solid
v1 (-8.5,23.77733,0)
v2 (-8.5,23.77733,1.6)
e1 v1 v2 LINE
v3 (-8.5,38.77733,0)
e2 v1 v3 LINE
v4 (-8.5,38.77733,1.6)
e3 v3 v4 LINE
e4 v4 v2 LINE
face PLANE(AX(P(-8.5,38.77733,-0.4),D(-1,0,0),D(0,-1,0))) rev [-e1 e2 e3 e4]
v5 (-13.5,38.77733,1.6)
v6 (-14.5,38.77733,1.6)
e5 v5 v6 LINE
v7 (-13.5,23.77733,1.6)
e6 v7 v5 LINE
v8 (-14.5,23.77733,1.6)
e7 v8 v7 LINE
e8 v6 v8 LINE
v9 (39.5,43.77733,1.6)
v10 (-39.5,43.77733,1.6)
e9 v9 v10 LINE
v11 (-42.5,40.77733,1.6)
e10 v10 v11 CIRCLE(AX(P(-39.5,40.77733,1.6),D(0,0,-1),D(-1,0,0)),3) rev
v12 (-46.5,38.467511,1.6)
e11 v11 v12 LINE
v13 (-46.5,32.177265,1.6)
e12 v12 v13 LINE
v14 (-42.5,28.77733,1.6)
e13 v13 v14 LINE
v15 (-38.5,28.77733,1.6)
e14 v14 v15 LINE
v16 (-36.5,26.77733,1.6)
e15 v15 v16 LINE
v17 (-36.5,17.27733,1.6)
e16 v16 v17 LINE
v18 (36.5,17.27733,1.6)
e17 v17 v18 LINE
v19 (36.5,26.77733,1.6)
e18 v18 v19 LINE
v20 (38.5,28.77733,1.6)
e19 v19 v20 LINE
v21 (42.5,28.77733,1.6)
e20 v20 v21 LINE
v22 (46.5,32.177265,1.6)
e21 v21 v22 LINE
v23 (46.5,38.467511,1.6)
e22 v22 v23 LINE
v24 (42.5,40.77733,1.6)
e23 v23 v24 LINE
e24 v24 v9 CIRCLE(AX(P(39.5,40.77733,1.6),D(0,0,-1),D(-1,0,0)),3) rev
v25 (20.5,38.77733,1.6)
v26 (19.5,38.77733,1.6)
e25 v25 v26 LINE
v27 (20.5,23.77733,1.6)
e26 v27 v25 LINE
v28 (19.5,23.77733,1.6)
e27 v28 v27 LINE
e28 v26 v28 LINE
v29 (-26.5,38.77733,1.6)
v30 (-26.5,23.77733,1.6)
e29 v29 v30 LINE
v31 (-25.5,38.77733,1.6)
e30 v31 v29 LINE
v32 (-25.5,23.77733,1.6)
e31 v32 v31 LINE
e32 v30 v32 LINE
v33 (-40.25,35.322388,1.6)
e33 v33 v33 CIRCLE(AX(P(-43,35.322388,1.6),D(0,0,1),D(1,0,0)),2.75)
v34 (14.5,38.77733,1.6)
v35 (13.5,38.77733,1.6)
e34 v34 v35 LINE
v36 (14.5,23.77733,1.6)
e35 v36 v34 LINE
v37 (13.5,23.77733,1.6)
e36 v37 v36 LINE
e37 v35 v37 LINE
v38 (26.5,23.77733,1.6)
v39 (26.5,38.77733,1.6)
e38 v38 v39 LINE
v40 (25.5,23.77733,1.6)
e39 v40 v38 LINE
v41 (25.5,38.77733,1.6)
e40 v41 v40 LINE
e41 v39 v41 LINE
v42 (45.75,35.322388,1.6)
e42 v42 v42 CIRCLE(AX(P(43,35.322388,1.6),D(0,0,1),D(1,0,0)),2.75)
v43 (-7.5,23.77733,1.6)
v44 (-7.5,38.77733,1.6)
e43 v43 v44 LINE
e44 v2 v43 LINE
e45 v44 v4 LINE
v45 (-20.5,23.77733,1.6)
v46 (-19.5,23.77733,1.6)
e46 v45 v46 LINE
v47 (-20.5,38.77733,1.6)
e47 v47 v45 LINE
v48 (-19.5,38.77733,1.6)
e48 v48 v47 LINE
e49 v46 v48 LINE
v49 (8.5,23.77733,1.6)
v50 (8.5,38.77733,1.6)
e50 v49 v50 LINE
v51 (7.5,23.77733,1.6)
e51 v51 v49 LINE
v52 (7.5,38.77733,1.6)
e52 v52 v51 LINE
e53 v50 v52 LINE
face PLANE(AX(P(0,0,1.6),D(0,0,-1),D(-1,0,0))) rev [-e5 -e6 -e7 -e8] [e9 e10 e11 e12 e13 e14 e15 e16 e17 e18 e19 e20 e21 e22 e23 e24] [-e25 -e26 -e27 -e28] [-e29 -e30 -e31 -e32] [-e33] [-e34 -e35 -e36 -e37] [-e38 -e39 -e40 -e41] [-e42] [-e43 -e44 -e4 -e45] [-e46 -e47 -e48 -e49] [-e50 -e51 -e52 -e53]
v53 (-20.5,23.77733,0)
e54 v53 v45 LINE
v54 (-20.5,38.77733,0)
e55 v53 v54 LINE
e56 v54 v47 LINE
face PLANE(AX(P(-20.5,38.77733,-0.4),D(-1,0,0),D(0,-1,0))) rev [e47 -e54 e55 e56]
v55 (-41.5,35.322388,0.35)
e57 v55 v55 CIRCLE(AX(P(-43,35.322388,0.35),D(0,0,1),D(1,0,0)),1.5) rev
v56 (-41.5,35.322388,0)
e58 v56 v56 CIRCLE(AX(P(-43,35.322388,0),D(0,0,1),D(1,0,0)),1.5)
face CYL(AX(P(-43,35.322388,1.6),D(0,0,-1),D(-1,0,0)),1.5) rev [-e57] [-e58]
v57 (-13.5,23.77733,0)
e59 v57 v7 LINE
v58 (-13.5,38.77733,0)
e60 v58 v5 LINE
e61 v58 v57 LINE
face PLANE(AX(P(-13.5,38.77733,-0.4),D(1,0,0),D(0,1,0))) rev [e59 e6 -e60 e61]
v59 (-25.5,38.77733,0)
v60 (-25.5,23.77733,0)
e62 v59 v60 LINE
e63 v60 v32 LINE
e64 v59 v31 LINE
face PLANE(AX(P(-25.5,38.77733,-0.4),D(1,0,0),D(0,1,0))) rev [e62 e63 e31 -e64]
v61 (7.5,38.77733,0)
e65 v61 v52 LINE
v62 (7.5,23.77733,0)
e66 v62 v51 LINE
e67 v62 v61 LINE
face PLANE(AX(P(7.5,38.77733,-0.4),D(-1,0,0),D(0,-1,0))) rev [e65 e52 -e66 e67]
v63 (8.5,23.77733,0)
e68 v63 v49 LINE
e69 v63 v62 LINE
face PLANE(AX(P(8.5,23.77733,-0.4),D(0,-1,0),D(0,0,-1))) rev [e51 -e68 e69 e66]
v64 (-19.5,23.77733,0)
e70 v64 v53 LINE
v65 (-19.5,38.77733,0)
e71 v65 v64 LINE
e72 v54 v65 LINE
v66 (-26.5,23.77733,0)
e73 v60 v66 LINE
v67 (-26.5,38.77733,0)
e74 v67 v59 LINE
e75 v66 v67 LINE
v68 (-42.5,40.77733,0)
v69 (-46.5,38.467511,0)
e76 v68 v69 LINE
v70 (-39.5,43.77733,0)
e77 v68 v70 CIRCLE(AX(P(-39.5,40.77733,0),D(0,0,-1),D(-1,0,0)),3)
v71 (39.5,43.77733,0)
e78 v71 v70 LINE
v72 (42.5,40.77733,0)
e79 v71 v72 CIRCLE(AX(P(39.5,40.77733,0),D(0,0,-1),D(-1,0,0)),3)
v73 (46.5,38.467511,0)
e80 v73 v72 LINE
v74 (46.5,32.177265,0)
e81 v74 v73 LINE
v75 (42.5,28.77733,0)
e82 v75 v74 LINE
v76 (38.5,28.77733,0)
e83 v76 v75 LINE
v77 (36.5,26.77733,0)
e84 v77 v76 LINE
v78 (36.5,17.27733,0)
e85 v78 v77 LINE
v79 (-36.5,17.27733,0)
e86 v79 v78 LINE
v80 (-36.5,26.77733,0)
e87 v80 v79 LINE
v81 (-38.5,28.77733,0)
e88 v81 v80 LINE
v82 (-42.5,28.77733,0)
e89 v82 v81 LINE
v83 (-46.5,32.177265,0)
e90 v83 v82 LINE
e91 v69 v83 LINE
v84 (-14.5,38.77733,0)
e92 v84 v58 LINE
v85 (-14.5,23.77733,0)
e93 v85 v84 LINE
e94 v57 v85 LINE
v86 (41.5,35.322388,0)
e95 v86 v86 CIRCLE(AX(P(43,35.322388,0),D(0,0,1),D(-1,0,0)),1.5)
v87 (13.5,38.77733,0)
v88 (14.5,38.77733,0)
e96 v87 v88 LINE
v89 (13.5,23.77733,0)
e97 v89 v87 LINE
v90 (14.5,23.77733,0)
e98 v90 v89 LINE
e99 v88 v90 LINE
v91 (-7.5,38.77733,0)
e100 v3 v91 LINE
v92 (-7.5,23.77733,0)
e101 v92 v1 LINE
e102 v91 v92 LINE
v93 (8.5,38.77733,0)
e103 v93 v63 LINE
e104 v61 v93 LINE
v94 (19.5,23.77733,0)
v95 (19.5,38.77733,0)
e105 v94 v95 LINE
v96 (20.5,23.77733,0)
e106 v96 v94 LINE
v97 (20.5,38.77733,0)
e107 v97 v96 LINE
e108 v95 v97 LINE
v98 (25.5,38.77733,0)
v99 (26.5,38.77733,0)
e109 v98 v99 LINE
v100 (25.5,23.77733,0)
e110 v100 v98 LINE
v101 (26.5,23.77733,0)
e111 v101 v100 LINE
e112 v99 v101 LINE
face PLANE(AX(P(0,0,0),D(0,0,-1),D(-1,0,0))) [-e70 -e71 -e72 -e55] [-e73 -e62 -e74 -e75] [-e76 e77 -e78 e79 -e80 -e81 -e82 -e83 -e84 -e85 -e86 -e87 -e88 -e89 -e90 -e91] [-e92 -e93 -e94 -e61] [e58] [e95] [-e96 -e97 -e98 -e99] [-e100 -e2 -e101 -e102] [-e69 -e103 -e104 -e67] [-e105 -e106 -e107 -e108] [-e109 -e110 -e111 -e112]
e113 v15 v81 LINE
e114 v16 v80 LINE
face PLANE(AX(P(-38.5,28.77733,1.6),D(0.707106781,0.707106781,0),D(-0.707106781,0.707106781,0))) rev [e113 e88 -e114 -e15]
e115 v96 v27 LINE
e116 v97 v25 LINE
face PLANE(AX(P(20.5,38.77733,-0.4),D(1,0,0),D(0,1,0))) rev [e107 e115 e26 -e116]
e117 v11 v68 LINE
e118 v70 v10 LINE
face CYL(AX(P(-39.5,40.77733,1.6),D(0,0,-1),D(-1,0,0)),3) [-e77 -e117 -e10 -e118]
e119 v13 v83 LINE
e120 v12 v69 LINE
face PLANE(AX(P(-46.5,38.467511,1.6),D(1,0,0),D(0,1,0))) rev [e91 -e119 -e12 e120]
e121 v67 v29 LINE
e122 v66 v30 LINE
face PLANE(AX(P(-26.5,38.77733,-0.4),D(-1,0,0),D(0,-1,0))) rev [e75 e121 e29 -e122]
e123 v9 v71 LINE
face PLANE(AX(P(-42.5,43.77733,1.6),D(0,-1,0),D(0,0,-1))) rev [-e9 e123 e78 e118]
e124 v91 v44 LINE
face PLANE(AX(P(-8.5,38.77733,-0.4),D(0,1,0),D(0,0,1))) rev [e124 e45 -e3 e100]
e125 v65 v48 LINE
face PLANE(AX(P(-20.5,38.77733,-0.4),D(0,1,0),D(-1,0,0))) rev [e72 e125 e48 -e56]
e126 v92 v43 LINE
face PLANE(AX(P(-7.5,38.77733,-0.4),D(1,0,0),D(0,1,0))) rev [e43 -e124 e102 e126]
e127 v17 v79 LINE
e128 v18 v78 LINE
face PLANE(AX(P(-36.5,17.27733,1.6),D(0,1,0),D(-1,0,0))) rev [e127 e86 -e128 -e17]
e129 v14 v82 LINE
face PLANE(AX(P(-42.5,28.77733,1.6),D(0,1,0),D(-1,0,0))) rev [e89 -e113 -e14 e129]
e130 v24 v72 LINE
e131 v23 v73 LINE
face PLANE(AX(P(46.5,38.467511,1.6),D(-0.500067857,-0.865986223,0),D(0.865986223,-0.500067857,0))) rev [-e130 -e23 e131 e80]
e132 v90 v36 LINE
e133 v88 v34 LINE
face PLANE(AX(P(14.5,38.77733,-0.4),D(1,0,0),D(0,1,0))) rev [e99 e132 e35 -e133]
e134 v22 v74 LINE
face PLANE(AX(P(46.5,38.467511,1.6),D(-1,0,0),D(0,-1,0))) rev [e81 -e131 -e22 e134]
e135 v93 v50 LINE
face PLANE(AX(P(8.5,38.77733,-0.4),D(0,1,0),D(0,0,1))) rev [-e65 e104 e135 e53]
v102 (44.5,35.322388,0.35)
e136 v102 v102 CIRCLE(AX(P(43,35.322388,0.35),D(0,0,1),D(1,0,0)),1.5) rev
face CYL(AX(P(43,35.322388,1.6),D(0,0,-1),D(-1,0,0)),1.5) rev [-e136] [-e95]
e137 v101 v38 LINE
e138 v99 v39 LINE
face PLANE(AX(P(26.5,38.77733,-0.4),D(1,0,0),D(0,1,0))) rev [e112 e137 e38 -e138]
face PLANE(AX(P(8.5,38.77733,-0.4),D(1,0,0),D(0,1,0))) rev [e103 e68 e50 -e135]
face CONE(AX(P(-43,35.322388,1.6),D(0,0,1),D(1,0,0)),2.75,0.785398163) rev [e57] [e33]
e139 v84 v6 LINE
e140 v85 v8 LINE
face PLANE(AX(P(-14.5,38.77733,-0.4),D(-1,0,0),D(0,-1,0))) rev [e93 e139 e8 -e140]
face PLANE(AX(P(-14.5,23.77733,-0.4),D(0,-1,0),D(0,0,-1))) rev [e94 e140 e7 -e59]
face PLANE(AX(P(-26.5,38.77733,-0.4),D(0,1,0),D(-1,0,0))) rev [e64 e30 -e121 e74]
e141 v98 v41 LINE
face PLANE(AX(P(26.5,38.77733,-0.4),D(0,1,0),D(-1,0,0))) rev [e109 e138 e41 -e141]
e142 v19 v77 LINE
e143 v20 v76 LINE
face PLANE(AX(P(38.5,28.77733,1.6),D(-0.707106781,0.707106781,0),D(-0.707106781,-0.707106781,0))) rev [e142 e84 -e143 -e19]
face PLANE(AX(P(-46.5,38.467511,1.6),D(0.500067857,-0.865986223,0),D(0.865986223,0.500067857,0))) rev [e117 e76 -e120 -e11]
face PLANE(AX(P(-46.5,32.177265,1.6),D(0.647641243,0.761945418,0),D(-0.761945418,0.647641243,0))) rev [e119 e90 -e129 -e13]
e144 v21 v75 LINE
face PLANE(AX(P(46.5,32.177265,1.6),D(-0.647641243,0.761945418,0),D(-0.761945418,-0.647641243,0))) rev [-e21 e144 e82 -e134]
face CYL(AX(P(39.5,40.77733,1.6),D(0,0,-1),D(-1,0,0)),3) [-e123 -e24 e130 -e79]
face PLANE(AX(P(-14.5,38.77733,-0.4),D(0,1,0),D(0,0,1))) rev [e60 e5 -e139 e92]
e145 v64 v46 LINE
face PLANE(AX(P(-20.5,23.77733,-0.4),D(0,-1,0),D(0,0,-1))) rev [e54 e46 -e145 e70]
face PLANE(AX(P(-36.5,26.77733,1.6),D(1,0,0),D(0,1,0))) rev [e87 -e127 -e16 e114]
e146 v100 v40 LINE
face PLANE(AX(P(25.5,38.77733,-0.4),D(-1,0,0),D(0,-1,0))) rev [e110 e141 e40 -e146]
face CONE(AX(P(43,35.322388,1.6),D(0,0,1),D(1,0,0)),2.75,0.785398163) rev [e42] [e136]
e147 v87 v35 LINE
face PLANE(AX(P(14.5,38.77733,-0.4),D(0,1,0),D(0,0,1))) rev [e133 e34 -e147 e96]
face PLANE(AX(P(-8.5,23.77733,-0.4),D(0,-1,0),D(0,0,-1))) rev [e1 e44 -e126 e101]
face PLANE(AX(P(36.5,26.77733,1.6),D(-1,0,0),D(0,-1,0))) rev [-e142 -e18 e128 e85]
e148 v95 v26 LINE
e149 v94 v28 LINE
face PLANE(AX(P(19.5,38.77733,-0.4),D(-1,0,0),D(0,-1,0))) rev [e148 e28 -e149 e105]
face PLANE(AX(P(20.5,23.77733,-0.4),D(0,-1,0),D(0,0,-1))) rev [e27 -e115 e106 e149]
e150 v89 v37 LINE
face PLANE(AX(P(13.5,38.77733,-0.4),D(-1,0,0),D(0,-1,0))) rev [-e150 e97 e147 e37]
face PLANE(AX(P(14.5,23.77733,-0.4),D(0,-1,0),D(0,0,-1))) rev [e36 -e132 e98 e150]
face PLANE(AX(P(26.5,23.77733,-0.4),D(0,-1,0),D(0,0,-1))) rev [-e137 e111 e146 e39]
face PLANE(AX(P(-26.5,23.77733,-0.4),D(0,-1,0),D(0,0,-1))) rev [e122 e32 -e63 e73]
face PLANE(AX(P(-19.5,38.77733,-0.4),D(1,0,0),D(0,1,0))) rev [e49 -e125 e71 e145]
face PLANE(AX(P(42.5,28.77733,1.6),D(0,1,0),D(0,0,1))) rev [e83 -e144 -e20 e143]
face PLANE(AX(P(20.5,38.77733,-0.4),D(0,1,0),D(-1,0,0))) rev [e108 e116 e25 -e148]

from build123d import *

# Parameters (mm, degrees)
SKETCH1_R                   = 1.5
BOSS_EXTRUDE1_DEPTH         = 1.6
FILLET1_R                   = 3
FILLET2_R                   = 3
SKETCH2_R                   = 2.75
SCREW_HEADS_DEPTH           = 2
SCREW_HEADS_DRAFT           = -45
SCREW_HEADS_PROFILE_2_DEPTH = 2
SCREW_HEADS_PROFILE_2_DRAFT = -45
SKETCH3_W                   = 1
SKETCH3_H                   = 15
AIR_VENTS_DEPTH             = 2


with BuildPart() as part:
    # Sketch1 → Boss-Extrude1 (new body)
    with BuildSketch(Plane.XY):
        Polygon((-42.5, 43.777330307), (42.5, 43.777330307), (42.5, 40.777330307), (46.5, 38.467511309), (46.5, 32.177265409), (42.5, 28.777330307), (38.5, 28.777330307), (36.5, 26.777330307), (36.5, 17.277330307), (-36.5, 17.277330307), (-36.5, 26.777330307), (-38.5, 28.777330307), (-42.5, 28.777330307), (-46.5, 32.177265409), (-46.5, 38.467511309), (-42.5, 40.777330307), align=None)
        with Locations((-43, 35.322388359)):
            Circle(SKETCH1_R, mode=Mode.SUBTRACT)
        with Locations(Location((43, 35.322388359, 0), (0, 0, 180))):
            Circle(SKETCH1_R, mode=Mode.SUBTRACT)
    extrude(amount=BOSS_EXTRUDE1_DEPTH)

    # Fillet1
    fillet1_edges = [part.edges().sort_by_distance(p)[0] for p in [
        (42.5, 43.777330307, 0.8),
    ]]
    fillet(fillet1_edges, radius=FILLET1_R - 0.0001)  # a hair under: the kernel refuses the full size

    # Fillet2
    fillet2_edges = [part.edges().sort_by_distance(p)[0] for p in [
        (-42.5, 43.777330307, 0.8),
    ]]
    fillet(fillet2_edges, radius=FILLET2_R - 0.0001)  # a hair under: the kernel refuses the full size


with BuildPart() as screw_heads_tool:
    # Sketch2 → Screw Heads (with draft: the straight prism first)
    with BuildSketch(Plane.XY.offset(1.6)):
        with Locations((-43, 35.322388359)):
            Circle(SKETCH2_R)
    extrude(amount=-SCREW_HEADS_DEPTH)
    # Screw Heads: the draft: its side faces are tilted about the plane it starts from
    screw_heads_sides = [screw_heads_tool.faces().sort_by_distance(p)[0] for p in [
        (-45.75, 35.322388359, 0.6),
    ]]
    draft(screw_heads_sides, Plane.XY.offset(1.6), SCREW_HEADS_DRAFT)


with BuildPart() as part_1:
    add(part.part)

    # Screw Heads: cut by screw_heads_tool
    add(screw_heads_tool.part, mode=Mode.SUBTRACT)


with BuildPart() as screw_heads_profile_2_tool:
    # Sketch2 → Screw Heads profile 2 (with draft: the straight prism first)
    with BuildSketch(Plane.XY.offset(1.6)):
        with Locations((43, 35.322388359)):
            Circle(SKETCH2_R)
    extrude(amount=-SCREW_HEADS_PROFILE_2_DEPTH)
    # Screw Heads profile 2: the draft: its side faces are tilted about the plane it starts from
    screw_heads_profile_2_sides = [screw_heads_profile_2_tool.faces().sort_by_distance(p)[0] for p in [
        (40.25, 35.322388359, 0.6),
    ]]
    draft(screw_heads_profile_2_sides, Plane.XY.offset(1.6), SCREW_HEADS_PROFILE_2_DRAFT)


with BuildPart() as part_2:
    add(part_1.part)

    # Screw Heads profile 2: cut by screw_heads_profile_2_tool
    add(screw_heads_profile_2_tool.part, mode=Mode.SUBTRACT)

    # Sketch3 → Air Vents (cut)
    with BuildSketch(Plane.XY.offset(1.6)):
        with Locations((-26, 31.277330307)):
            Rectangle(SKETCH3_W, SKETCH3_H)
        with Locations((-20, 31.277330307)):
            Rectangle(SKETCH3_W, SKETCH3_H)
        with Locations((-14, 31.277330307)):
            Rectangle(SKETCH3_W, SKETCH3_H)
        with Locations((-8, 31.277330307)):
            Rectangle(SKETCH3_W, SKETCH3_H)
        with Locations((8, 31.277330307)):
            Rectangle(SKETCH3_W, SKETCH3_H)
        with Locations((14, 31.277330307)):
            Rectangle(SKETCH3_W, SKETCH3_H)
        with Locations((20, 31.277330307)):
            Rectangle(SKETCH3_W, SKETCH3_H)
        with Locations((26, 31.277330307)):
            Rectangle(SKETCH3_W, SKETCH3_H)
    extrude(amount=-AIR_VENTS_DEPTH, mode=Mode.SUBTRACT)


solid = part_2.part
